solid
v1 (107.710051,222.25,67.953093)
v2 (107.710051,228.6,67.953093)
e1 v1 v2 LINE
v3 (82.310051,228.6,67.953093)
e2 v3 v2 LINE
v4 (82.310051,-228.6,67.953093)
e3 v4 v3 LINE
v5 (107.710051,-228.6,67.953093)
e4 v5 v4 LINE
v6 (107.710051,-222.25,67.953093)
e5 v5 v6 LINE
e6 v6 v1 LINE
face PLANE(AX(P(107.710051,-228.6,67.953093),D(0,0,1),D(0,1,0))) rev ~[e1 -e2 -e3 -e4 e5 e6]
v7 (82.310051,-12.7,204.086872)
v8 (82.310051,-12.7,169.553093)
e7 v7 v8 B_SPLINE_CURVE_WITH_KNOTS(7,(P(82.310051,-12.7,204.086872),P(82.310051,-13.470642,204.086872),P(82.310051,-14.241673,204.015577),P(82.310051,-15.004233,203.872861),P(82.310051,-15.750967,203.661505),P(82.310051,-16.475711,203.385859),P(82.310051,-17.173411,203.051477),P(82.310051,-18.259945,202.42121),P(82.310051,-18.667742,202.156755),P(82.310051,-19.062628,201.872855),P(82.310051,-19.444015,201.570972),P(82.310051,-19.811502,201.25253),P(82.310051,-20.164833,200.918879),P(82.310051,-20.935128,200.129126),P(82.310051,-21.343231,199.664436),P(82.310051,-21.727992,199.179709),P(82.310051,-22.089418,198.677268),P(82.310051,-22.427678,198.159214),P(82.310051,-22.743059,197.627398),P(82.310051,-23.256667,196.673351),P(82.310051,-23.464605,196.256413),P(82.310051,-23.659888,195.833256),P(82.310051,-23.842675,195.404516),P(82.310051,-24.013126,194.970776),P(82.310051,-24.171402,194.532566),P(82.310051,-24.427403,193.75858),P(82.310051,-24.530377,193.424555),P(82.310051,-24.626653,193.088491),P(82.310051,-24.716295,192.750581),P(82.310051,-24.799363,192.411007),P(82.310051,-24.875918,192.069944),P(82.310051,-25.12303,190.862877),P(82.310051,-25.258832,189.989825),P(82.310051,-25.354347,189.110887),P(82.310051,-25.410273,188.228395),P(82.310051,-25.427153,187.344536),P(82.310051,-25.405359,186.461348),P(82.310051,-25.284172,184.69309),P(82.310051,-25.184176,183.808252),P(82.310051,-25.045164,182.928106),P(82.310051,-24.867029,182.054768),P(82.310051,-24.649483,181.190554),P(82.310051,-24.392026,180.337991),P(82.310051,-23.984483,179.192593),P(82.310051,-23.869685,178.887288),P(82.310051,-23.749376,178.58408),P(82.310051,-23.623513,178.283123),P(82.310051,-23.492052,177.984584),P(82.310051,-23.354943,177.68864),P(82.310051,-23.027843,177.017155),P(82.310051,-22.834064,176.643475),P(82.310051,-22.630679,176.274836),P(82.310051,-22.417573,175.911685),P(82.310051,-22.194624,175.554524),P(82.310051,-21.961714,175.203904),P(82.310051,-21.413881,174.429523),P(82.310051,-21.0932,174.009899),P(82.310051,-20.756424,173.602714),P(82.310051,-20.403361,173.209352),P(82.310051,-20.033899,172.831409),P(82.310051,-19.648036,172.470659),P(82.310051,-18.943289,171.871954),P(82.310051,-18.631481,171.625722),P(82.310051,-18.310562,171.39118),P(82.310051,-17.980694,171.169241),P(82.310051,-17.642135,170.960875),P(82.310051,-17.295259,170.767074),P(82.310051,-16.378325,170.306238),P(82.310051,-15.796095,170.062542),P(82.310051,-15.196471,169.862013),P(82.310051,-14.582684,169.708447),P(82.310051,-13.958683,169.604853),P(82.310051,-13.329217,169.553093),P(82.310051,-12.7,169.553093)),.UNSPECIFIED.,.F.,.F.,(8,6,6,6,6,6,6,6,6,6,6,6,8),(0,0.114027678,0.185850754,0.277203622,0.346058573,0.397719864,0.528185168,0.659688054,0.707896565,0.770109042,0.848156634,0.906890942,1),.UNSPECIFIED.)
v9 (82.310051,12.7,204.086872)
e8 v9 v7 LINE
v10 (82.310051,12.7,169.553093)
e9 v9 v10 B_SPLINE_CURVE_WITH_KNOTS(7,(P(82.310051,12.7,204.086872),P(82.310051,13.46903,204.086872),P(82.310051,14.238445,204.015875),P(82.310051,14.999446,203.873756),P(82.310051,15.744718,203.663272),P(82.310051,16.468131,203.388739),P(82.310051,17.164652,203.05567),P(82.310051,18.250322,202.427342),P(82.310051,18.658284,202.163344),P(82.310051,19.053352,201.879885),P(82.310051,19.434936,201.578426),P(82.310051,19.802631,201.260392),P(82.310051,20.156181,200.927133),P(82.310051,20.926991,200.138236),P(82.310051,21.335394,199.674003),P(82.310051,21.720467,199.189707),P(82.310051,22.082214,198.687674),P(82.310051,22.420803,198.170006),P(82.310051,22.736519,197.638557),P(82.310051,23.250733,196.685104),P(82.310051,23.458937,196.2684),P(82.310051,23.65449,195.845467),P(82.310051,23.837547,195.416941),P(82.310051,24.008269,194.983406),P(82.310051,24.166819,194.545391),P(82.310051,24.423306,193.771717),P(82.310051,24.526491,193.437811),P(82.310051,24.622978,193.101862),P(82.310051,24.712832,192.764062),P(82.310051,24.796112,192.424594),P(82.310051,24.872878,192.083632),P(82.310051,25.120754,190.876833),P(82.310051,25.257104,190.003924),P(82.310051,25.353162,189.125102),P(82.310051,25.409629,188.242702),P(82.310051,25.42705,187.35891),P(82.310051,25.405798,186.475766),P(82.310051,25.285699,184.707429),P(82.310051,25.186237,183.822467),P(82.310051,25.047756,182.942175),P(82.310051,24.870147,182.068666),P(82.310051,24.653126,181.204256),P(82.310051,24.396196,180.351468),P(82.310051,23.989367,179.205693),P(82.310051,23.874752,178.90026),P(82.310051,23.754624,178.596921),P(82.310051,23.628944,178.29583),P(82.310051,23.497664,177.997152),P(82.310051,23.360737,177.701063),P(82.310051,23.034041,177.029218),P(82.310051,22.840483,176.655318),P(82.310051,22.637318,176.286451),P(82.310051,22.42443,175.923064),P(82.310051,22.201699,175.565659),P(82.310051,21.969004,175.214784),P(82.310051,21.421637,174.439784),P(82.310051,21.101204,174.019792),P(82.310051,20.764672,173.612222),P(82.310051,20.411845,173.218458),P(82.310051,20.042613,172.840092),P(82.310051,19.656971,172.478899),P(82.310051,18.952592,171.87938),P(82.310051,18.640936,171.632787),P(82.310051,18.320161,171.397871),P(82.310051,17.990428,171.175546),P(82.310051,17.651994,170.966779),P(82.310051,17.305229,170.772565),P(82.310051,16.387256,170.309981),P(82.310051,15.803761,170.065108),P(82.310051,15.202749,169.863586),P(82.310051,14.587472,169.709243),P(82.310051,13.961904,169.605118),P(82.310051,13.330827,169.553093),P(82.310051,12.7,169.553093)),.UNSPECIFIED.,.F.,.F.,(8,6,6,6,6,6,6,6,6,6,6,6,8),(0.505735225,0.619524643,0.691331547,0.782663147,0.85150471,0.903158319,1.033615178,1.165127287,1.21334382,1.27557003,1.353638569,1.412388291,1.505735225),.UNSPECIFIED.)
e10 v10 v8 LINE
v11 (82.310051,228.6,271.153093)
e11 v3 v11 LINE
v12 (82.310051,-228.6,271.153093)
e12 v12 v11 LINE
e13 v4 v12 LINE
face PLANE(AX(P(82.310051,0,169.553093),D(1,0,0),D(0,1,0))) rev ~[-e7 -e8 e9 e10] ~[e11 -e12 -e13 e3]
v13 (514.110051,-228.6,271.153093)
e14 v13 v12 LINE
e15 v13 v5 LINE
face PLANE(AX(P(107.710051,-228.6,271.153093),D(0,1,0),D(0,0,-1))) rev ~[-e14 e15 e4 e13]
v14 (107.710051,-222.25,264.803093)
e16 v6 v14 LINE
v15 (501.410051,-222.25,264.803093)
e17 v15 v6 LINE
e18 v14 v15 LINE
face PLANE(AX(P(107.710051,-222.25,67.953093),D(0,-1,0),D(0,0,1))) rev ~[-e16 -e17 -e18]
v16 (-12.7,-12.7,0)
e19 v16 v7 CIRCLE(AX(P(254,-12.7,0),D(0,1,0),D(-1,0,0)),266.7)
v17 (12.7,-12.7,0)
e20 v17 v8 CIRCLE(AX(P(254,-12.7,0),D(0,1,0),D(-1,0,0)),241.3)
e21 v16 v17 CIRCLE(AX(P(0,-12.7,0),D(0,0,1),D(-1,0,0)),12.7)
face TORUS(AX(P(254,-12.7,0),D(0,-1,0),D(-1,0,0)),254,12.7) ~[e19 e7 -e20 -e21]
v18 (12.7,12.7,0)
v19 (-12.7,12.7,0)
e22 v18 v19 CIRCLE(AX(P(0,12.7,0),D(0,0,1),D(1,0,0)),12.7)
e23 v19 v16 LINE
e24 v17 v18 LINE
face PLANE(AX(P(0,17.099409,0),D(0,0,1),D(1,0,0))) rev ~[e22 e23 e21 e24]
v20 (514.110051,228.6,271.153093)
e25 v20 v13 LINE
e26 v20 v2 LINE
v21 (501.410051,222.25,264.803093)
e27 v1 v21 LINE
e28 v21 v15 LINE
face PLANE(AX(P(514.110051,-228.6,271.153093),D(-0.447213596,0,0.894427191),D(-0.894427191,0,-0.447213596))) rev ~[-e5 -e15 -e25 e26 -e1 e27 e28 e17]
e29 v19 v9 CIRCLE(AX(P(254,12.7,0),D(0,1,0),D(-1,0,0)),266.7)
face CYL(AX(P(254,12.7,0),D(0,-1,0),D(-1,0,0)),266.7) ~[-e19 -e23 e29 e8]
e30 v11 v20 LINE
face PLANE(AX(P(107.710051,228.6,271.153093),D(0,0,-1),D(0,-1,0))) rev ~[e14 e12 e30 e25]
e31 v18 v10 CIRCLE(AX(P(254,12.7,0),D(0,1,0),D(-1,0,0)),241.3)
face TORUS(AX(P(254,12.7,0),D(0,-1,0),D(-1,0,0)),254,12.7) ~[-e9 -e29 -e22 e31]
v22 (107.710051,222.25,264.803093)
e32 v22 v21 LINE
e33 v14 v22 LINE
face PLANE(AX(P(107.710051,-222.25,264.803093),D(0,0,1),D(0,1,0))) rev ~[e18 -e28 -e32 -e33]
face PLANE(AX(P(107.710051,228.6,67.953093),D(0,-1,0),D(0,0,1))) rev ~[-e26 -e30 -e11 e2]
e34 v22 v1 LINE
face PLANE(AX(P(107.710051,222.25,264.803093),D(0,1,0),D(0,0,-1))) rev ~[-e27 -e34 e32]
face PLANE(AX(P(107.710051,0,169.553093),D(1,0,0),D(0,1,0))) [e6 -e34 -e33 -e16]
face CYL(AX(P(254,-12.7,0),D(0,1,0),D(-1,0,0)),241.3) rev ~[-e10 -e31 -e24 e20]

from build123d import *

# Parameters (mm, degrees)
F1_ANGLE      = 50
F3_DEPTH      = 25.4
F3_DEPTH_BACK = 25.4
F4_W          = 457.2
F4_H          = 203.2
F5_DEPTH      = 25.4
F7_DEPTH      = 406.4
F9_DEPTH      = 457.2


# Not quite as in the source:
# - ends of sketch curves that miss each other by under 0.0002 mm in the source are joined


with BuildPart() as f1:
    # F0 (on Top) → F1 (revolve)
    with BuildSketch(Plane.XY):
        with BuildLine():
            Line((-12.7, 12.7), (12.7, 12.7))
            ThreePointArc((12.7, 12.7), (0, 25.4), (-12.7, 12.7))
        make_face()
        with BuildLine():
            ThreePointArc((0, 0), (8.9802561211, 3.7197438789), (12.7, 12.7))
            Line((12.7, 12.7), (-12.7, 12.7))
            ThreePointArc((-12.7, 12.7), (-8.9802561211, 3.7197438789), (0, 0))
        make_face()
        with BuildLine():
            ThreePointArc((0, 0), (-8.9802561211, 3.7197438789), (-12.7, 12.7))
            Line((-12.7, 12.7), (-12.7, -12.7))
            ThreePointArc((-12.7, -12.7), (-8.9802561211, -3.7197438789), (0, 0))
        make_face()
        with BuildLine():
            Line((-12.7, -12.7), (12.7, -12.7))
            ThreePointArc((12.7, -12.7), (8.9802561211, -3.7197438789), (0, 0))
            ThreePointArc((0, 0), (-8.9802561211, -3.7197438789), (-12.7, -12.7))
        make_face()
        with BuildLine():
            ThreePointArc((-12.7, -12.7), (0, -25.4), (12.7, -12.7))
            Line((12.7, -12.7), (-12.7, -12.7))
        make_face()
        with BuildLine():
            Line((12.7, -12.7), (12.7, 12.7))
            ThreePointArc((12.7, 12.7), (8.9802561211, 3.7197438789), (0, 0))
            ThreePointArc((0, 0), (8.9802561211, -3.7197438789), (12.7, -12.7))
        make_face()
    revolve(axis=Axis((254, -3.8792621344, 0), (0, 1, 0)), revolution_arc=F1_ANGLE)

    # F2 (on Front) → F3 (cut, two sides)
    with BuildSketch(Plane.XZ) as f3_sk:
        Polygon((106.0351878405, 182.2580546141), (82.3100507259, 209.7299993038), (82.3100507259, 161.4786684513), align=None)
    extrude(amount=-F3_DEPTH, mode=Mode.SUBTRACT)
    extrude(f3_sk.sketch, amount=F3_DEPTH_BACK, mode=Mode.SUBTRACT)

    # F4 (on face) → F5 (join)
    with BuildSketch(Plane.YZ.offset(82.3100507259)):
        with Locations((0, 169.5530929186)):
            Rectangle(F4_W, F4_H)
        with BuildLine():
            Line((-12.7, 204.086871989), (12.7000006, 204.086871989))
            add(Edge.make_bspline(
                [(12.7000006, 204.086871989), (13.4690296338, 204.086871989), (14.2384453449, 204.0158750527), (14.9994460853, 203.8737558758), (15.7447177383, 203.6632719315), (16.4681309148, 203.3887393276), (17.1646524297, 203.0556697533), (18.2503222123, 202.4273420372), (18.6582844029, 202.1633436545), (19.0533520587, 201.8798852777), (19.4349362062, 201.5784262784), (19.8026309726, 201.2603920692), (20.1561814277, 200.9271325062), (20.9269905431, 200.1382361762), (21.3353938255, 199.6740027948), (21.7204670532, 199.1897069539), (22.0822142472, 198.6876735203), (22.420802674, 198.1700063327), (22.736519166, 197.6385568319), (23.250732617, 196.6851036415), (23.4589370134, 196.2683997588), (23.6544895384, 195.8454671817), (23.8375468192, 195.4169412733), (24.0082694094, 194.9834055779), (24.1668189946, 194.5453907771), (24.4233058083, 193.7717167394), (24.5264910507, 193.4378114469), (24.6229782806, 193.1018618849), (24.7128315819, 192.7640616927), (24.7961121661, 192.424594033), (24.8728783731, 192.0836315915), (25.1207544658, 190.876832951), (25.2571036638, 190.0039240497), (25.3531616976, 189.1251020116), (25.4096294667, 188.2427019804), (25.4270499712, 187.3589101884), (25.4057980417, 186.4757661893), (25.2856985057, 184.7074291559), (25.1862372229, 183.8224674602), (25.0477555884, 182.9421748337), (24.8701470857, 182.0686660516), (24.6531262016, 181.2042555644), (24.396196314, 180.3514681207), (23.98936689, 179.2056925756), (23.8747515893, 178.9002604218), (23.7546244835, 178.5969213548), (23.628943781, 178.2958298606), (23.4976641834, 177.9971515263), (23.3607368855, 177.7010630394), (23.0340408205, 177.0292176497), (22.8404825612, 176.6553180497), (22.6373184094, 176.286450794), (22.4244302808, 175.923064433), (22.2016988546, 175.5656585526), (21.9690040336, 175.2147836652), (21.4216371496, 174.439784246), (21.1012037916, 174.0197923426), (20.7646717024, 173.6122217846), (20.411845386, 173.2184579323), (20.0426129089, 172.8400922025), (19.6569713302, 172.4788991587), (18.9525917336, 171.8793804305), (18.6409356563, 171.6327871636), (18.3201611387, 171.3978713881), (17.9904282668, 171.175545954), (17.6519935165, 170.9667789735), (17.3052290423, 170.7725645788), (16.3872564507, 170.30998109), (15.8037606781, 170.0651084693), (15.202749403, 169.8635860217), (14.5874722629, 169.7092428977), (13.9619040353, 169.6051183146), (13.3308265381, 169.5530929186), (12.7, 169.5530929186)],
                knots=[0.5057352072, 0.5057352072, 0.5057352072, 0.5057352072, 0.5057352072, 0.5057352072, 0.5057352072, 0.5057352072, 0.6195246246, 0.6195246246, 0.6195246246, 0.6195246246, 0.6195246246, 0.6195246246, 0.691331529, 0.691331529, 0.691331529, 0.691331529, 0.691331529, 0.691331529, 0.7826631285, 0.7826631285, 0.7826631285, 0.7826631285, 0.7826631285, 0.7826631285, 0.8515046919, 0.8515046919, 0.8515046919, 0.8515046919, 0.8515046919, 0.8515046919, 0.9031583009, 0.9031583009, 0.9031583009, 0.9031583009, 0.9031583009, 0.9031583009, 1.0336151594, 1.0336151594, 1.0336151594, 1.0336151594, 1.0336151594, 1.0336151594, 1.1651272693, 1.1651272693, 1.1651272693, 1.1651272693, 1.1651272693, 1.1651272693, 1.2133438014, 1.2133438014, 1.2133438014, 1.2133438014, 1.2133438014, 1.2133438014, 1.275570012, 1.275570012, 1.275570012, 1.275570012, 1.275570012, 1.275570012, 1.3536385506, 1.3536385506, 1.3536385506, 1.3536385506, 1.3536385506, 1.3536385506, 1.412388273, 1.412388273, 1.412388273, 1.412388273, 1.412388273, 1.412388273, 1.5057352072, 1.5057352072, 1.5057352072, 1.5057352072, 1.5057352072, 1.5057352072, 1.5057352072, 1.5057352072], degree=7))
            Line((12.7, 169.5530929186), (-12.7000006, 169.5530929186))
            add(Edge.make_bspline(
                [(-12.7, 204.086871989), (-13.4706419927, 204.086871989), (-14.2416727155, 204.0155770292), (-15.0042333997, 203.8728607028), (-15.750966819, 203.6615047617), (-16.4757112201, 203.385859421), (-17.1734108274, 203.0514773721), (-18.2599454854, 202.421209965), (-18.6677421137, 202.1567547593), (-19.0626276136, 201.8728554308), (-19.4440153557, 201.5709719561), (-19.8115015564, 201.2525298833), (-20.1648331318, 200.9188788331), (-20.9351284745, 200.129125636), (-21.3432310697, 199.664436441), (-21.7279921591, 199.179709209), (-22.0894180876, 198.677267534), (-22.4276778241, 198.1592138164), (-22.7430593956, 197.6273980388), (-23.2566674815, 196.6733514115), (-23.4646047683, 196.2564127529), (-23.659888404, 195.8332560761), (-23.8426752316, 195.4045161634), (-24.0131259335, 194.9707760325), (-24.1714022488, 194.5325659004), (-24.4274032953, 193.7585803928), (-24.5303772724, 193.4245553586), (-24.626653065, 193.0884909648), (-24.7162947319, 192.7505806742), (-24.7993634474, 192.4110074931), (-24.8759175013, 192.0699439709), (-25.1230295402, 190.8628768117), (-25.2588319682, 189.9898251152), (-25.3543467105, 189.1108867647), (-25.4102732079, 188.2283952031), (-25.4271528417, 187.3445356956), (-25.4053586427, 186.4613475677), (-25.2841715299, 184.6930901591), (-25.184175573, 183.8082519745), (-25.0451643421, 182.9281062846), (-24.8670292224, 182.0547683599), (-24.6494826959, 181.1905540646), (-24.39202618, 180.337990515), (-23.9844834065, 179.1925931098), (-23.8696850934, 178.8872878707), (-23.7493755543, 178.584079685), (-23.6235129254, 178.2831232001), (-23.4920518465, 177.984584189), (-23.3549434604, 177.6886395502), (-23.0278434233, 177.0171551156), (-22.8340635577, 176.6434752959), (-22.630679354, 176.274835687), (-22.4175727111, 175.9116853585), (-22.1946243635, 175.5545244929), (-21.9617143535, 175.2039042681), (-21.413881263, 174.4295229159), (-21.0931995505, 174.009899279), (-20.7564242688, 173.6027135171), (-20.4033607941, 173.2093524612), (-20.0338985268, 172.8314090197), (-19.6480364418, 172.4706591125), (-18.9432894603, 171.8719538781), (-18.6314812112, 171.6257215316), (-18.3105623463, 171.3911796656), (-17.9806943678, 171.1692413992), (-17.6421353749, 170.9608748132), (-17.2952593711, 170.7670736149), (-16.3783249615, 170.3062381426), (-15.7960954678, 170.0625416452), (-15.196471078, 169.8620129232), (-14.5826838746, 169.7084467911), (-13.9586833556, 169.6048532006), (-13.3292171931, 169.5530929186), (-12.7000006, 169.5530929186)],
                knots=[0, 0, 0, 0, 0, 0, 0, 0, 0.1140276778, 0.1140276778, 0.1140276778, 0.1140276778, 0.1140276778, 0.1140276778, 0.1858507541, 0.1858507541, 0.1858507541, 0.1858507541, 0.1858507541, 0.1858507541, 0.2772036221, 0.2772036221, 0.2772036221, 0.2772036221, 0.2772036221, 0.2772036221, 0.3460585734, 0.3460585734, 0.3460585734, 0.3460585734, 0.3460585734, 0.3460585734, 0.3977198641, 0.3977198641, 0.3977198641, 0.3977198641, 0.3977198641, 0.3977198641, 0.5281851685, 0.5281851685, 0.5281851685, 0.5281851685, 0.5281851685, 0.5281851685, 0.6596880543, 0.6596880543, 0.6596880543, 0.6596880543, 0.6596880543, 0.6596880543, 0.7078965646, 0.7078965646, 0.7078965646, 0.7078965646, 0.7078965646, 0.7078965646, 0.7701090416, 0.7701090416, 0.7701090416, 0.7701090416, 0.7701090416, 0.7701090416, 0.8481566341, 0.8481566341, 0.8481566341, 0.8481566341, 0.8481566341, 0.8481566341, 0.906890942, 0.906890942, 0.906890942, 0.906890942, 0.906890942, 0.906890942, 1, 1, 1, 1, 1, 1, 1, 1], degree=7))
        make_face(mode=Mode.SUBTRACT)
        with BuildLine():
            add(Edge.make_bspline(
                [(12.7, 204.086871989), (13.4690296338, 204.086871989), (14.2384453449, 204.0158750527), (14.9994460853, 203.8737558758), (15.7447177383, 203.6632719315), (16.4681309148, 203.3887393276), (17.1646524297, 203.0556697533), (18.2503222123, 202.4273420372), (18.6582844029, 202.1633436545), (19.0533520587, 201.8798852777), (19.4349362062, 201.5784262784), (19.8026309726, 201.2603920692), (20.1561814277, 200.9271325062), (20.9269905431, 200.1382361762), (21.3353938255, 199.6740027948), (21.7204670532, 199.1897069539), (22.0822142472, 198.6876735203), (22.420802674, 198.1700063327), (22.736519166, 197.6385568319), (23.250732617, 196.6851036415), (23.4589370134, 196.2683997588), (23.6544895384, 195.8454671817), (23.8375468192, 195.4169412733), (24.0082694094, 194.9834055779), (24.1668189946, 194.5453907771), (24.4233058083, 193.7717167394), (24.5264910507, 193.4378114469), (24.6229782806, 193.1018618849), (24.7128315819, 192.7640616927), (24.7961121661, 192.424594033), (24.8728783731, 192.0836315915), (25.1207544658, 190.876832951), (25.2571036638, 190.0039240497), (25.3531616976, 189.1251020116), (25.4096294667, 188.2427019804), (25.4270499712, 187.3589101884), (25.4057980417, 186.4757661893), (25.2856985057, 184.7074291559), (25.1862372229, 183.8224674602), (25.0477555884, 182.9421748337), (24.8701470857, 182.0686660516), (24.6531262016, 181.2042555644), (24.396196314, 180.3514681207), (23.98936689, 179.2056925756), (23.8747515893, 178.9002604218), (23.7546244835, 178.5969213548), (23.628943781, 178.2958298606), (23.4976641834, 177.9971515263), (23.3607368855, 177.7010630394), (23.0340408205, 177.0292176497), (22.8404825612, 176.6553180497), (22.6373184094, 176.286450794), (22.4244302808, 175.923064433), (22.2016988546, 175.5656585526), (21.9690040336, 175.2147836652), (21.4216371496, 174.439784246), (21.1012037916, 174.0197923426), (20.7646717024, 173.6122217846), (20.411845386, 173.2184579323), (20.0426129089, 172.8400922025), (19.6569713302, 172.4788991587), (18.9525917336, 171.8793804305), (18.6409356563, 171.6327871636), (18.3201611387, 171.3978713881), (17.9904282668, 171.175545954), (17.6519935165, 170.9667789735), (17.3052290423, 170.7725645788), (16.3872564507, 170.30998109), (15.8037606781, 170.0651084693), (15.202749403, 169.8635860217), (14.5874722629, 169.7092428977), (13.9619040353, 169.6051183146), (13.3308265381, 169.5530929186), (12.7, 169.5530929186)],
                knots=[0.5057352072, 0.5057352072, 0.5057352072, 0.5057352072, 0.5057352072, 0.5057352072, 0.5057352072, 0.5057352072, 0.6195246246, 0.6195246246, 0.6195246246, 0.6195246246, 0.6195246246, 0.6195246246, 0.691331529, 0.691331529, 0.691331529, 0.691331529, 0.691331529, 0.691331529, 0.7826631285, 0.7826631285, 0.7826631285, 0.7826631285, 0.7826631285, 0.7826631285, 0.8515046919, 0.8515046919, 0.8515046919, 0.8515046919, 0.8515046919, 0.8515046919, 0.9031583009, 0.9031583009, 0.9031583009, 0.9031583009, 0.9031583009, 0.9031583009, 1.0336151594, 1.0336151594, 1.0336151594, 1.0336151594, 1.0336151594, 1.0336151594, 1.1651272693, 1.1651272693, 1.1651272693, 1.1651272693, 1.1651272693, 1.1651272693, 1.2133438014, 1.2133438014, 1.2133438014, 1.2133438014, 1.2133438014, 1.2133438014, 1.275570012, 1.275570012, 1.275570012, 1.275570012, 1.275570012, 1.275570012, 1.3536385506, 1.3536385506, 1.3536385506, 1.3536385506, 1.3536385506, 1.3536385506, 1.412388273, 1.412388273, 1.412388273, 1.412388273, 1.412388273, 1.412388273, 1.5057352072, 1.5057352072, 1.5057352072, 1.5057352072, 1.5057352072, 1.5057352072, 1.5057352072, 1.5057352072], degree=7))
            Line((12.7, 204.086871989), (-12.7, 204.086871989))
            add(Edge.make_bspline(
                [(-12.7, 204.086871989), (-13.4706419927, 204.086871989), (-14.2416727155, 204.0155770292), (-15.0042333997, 203.8728607028), (-15.750966819, 203.6615047617), (-16.4757112201, 203.385859421), (-17.1734108274, 203.0514773721), (-18.2599454854, 202.421209965), (-18.6677421137, 202.1567547593), (-19.0626276136, 201.8728554308), (-19.4440153557, 201.5709719561), (-19.8115015564, 201.2525298833), (-20.1648331318, 200.9188788331), (-20.9351284745, 200.129125636), (-21.3432310697, 199.664436441), (-21.7279921591, 199.179709209), (-22.0894180876, 198.677267534), (-22.4276778241, 198.1592138164), (-22.7430593956, 197.6273980388), (-23.2566674815, 196.6733514115), (-23.4646047683, 196.2564127529), (-23.659888404, 195.8332560761), (-23.8426752316, 195.4045161634), (-24.0131259335, 194.9707760325), (-24.1714022488, 194.5325659004), (-24.4274032953, 193.7585803928), (-24.5303772724, 193.4245553586), (-24.626653065, 193.0884909648), (-24.7162947319, 192.7505806742), (-24.7993634474, 192.4110074931), (-24.8759175013, 192.0699439709), (-25.1230295402, 190.8628768117), (-25.2588319682, 189.9898251152), (-25.3543467105, 189.1108867647), (-25.4102732079, 188.2283952031), (-25.4271528417, 187.3445356956), (-25.4053586427, 186.4613475677), (-25.2841715299, 184.6930901591), (-25.184175573, 183.8082519745), (-25.0451643421, 182.9281062846), (-24.8670292224, 182.0547683599), (-24.6494826959, 181.1905540646), (-24.39202618, 180.337990515), (-23.9844834065, 179.1925931098), (-23.8696850934, 178.8872878707), (-23.7493755543, 178.584079685), (-23.6235129254, 178.2831232001), (-23.4920518465, 177.984584189), (-23.3549434604, 177.6886395502), (-23.0278434233, 177.0171551156), (-22.8340635577, 176.6434752959), (-22.630679354, 176.274835687), (-22.4175727111, 175.9116853585), (-22.1946243635, 175.5545244929), (-21.9617143535, 175.2039042681), (-21.413881263, 174.4295229159), (-21.0931995505, 174.009899279), (-20.7564242688, 173.6027135171), (-20.4033607941, 173.2093524612), (-20.0338985268, 172.8314090197), (-19.6480364418, 172.4706591125), (-18.9432894603, 171.8719538781), (-18.6314812112, 171.6257215316), (-18.3105623463, 171.3911796656), (-17.9806943678, 171.1692413992), (-17.6421353749, 170.9608748132), (-17.2952593711, 170.7670736149), (-16.3783249615, 170.3062381426), (-15.7960954678, 170.0625416452), (-15.196471078, 169.8620129232), (-14.5826838746, 169.7084467911), (-13.9586833556, 169.6048532006), (-13.3292171931, 169.5530929186), (-12.7, 169.5530929186)],
                knots=[0, 0, 0, 0, 0, 0, 0, 0, 0.1140276778, 0.1140276778, 0.1140276778, 0.1140276778, 0.1140276778, 0.1140276778, 0.1858507541, 0.1858507541, 0.1858507541, 0.1858507541, 0.1858507541, 0.1858507541, 0.2772036221, 0.2772036221, 0.2772036221, 0.2772036221, 0.2772036221, 0.2772036221, 0.3460585734, 0.3460585734, 0.3460585734, 0.3460585734, 0.3460585734, 0.3460585734, 0.3977198641, 0.3977198641, 0.3977198641, 0.3977198641, 0.3977198641, 0.3977198641, 0.5281851685, 0.5281851685, 0.5281851685, 0.5281851685, 0.5281851685, 0.5281851685, 0.6596880543, 0.6596880543, 0.6596880543, 0.6596880543, 0.6596880543, 0.6596880543, 0.7078965646, 0.7078965646, 0.7078965646, 0.7078965646, 0.7078965646, 0.7078965646, 0.7701090416, 0.7701090416, 0.7701090416, 0.7701090416, 0.7701090416, 0.7701090416, 0.8481566341, 0.8481566341, 0.8481566341, 0.8481566341, 0.8481566341, 0.8481566341, 0.906890942, 0.906890942, 0.906890942, 0.906890942, 0.906890942, 0.906890942, 1, 1, 1, 1, 1, 1, 1, 1], degree=7))
            Line((-12.7, 169.5530929186), (12.7, 169.5530929186))
        make_face()
    extrude(amount=F5_DEPTH)

    # F6 (on face) → F7 (join)
    with BuildSketch(Plane.YZ.offset(107.7100507259)):
        Polygon((-222.25, 67.9530929186), (-222.25, 264.8030929186), (222.25, 264.8030929186), (222.25, 67.9530929186), (228.6, 67.9530929186), (228.6, 271.1530929186), (-228.6, 271.1530929186), (-228.6, 67.9530929186), align=None)
    extrude(amount=F7_DEPTH)

    # F8 (on face) → F9 (cut)
    with BuildSketch(Plane.XZ.offset(228.6)):
        Polygon((514.1100507259, 271.1530929186), (107.7100507259, 67.9530929186), (514.1100507259, 67.9530929186), align=None)
    extrude(amount=-F9_DEPTH, mode=Mode.SUBTRACT)


solid = f1.part
